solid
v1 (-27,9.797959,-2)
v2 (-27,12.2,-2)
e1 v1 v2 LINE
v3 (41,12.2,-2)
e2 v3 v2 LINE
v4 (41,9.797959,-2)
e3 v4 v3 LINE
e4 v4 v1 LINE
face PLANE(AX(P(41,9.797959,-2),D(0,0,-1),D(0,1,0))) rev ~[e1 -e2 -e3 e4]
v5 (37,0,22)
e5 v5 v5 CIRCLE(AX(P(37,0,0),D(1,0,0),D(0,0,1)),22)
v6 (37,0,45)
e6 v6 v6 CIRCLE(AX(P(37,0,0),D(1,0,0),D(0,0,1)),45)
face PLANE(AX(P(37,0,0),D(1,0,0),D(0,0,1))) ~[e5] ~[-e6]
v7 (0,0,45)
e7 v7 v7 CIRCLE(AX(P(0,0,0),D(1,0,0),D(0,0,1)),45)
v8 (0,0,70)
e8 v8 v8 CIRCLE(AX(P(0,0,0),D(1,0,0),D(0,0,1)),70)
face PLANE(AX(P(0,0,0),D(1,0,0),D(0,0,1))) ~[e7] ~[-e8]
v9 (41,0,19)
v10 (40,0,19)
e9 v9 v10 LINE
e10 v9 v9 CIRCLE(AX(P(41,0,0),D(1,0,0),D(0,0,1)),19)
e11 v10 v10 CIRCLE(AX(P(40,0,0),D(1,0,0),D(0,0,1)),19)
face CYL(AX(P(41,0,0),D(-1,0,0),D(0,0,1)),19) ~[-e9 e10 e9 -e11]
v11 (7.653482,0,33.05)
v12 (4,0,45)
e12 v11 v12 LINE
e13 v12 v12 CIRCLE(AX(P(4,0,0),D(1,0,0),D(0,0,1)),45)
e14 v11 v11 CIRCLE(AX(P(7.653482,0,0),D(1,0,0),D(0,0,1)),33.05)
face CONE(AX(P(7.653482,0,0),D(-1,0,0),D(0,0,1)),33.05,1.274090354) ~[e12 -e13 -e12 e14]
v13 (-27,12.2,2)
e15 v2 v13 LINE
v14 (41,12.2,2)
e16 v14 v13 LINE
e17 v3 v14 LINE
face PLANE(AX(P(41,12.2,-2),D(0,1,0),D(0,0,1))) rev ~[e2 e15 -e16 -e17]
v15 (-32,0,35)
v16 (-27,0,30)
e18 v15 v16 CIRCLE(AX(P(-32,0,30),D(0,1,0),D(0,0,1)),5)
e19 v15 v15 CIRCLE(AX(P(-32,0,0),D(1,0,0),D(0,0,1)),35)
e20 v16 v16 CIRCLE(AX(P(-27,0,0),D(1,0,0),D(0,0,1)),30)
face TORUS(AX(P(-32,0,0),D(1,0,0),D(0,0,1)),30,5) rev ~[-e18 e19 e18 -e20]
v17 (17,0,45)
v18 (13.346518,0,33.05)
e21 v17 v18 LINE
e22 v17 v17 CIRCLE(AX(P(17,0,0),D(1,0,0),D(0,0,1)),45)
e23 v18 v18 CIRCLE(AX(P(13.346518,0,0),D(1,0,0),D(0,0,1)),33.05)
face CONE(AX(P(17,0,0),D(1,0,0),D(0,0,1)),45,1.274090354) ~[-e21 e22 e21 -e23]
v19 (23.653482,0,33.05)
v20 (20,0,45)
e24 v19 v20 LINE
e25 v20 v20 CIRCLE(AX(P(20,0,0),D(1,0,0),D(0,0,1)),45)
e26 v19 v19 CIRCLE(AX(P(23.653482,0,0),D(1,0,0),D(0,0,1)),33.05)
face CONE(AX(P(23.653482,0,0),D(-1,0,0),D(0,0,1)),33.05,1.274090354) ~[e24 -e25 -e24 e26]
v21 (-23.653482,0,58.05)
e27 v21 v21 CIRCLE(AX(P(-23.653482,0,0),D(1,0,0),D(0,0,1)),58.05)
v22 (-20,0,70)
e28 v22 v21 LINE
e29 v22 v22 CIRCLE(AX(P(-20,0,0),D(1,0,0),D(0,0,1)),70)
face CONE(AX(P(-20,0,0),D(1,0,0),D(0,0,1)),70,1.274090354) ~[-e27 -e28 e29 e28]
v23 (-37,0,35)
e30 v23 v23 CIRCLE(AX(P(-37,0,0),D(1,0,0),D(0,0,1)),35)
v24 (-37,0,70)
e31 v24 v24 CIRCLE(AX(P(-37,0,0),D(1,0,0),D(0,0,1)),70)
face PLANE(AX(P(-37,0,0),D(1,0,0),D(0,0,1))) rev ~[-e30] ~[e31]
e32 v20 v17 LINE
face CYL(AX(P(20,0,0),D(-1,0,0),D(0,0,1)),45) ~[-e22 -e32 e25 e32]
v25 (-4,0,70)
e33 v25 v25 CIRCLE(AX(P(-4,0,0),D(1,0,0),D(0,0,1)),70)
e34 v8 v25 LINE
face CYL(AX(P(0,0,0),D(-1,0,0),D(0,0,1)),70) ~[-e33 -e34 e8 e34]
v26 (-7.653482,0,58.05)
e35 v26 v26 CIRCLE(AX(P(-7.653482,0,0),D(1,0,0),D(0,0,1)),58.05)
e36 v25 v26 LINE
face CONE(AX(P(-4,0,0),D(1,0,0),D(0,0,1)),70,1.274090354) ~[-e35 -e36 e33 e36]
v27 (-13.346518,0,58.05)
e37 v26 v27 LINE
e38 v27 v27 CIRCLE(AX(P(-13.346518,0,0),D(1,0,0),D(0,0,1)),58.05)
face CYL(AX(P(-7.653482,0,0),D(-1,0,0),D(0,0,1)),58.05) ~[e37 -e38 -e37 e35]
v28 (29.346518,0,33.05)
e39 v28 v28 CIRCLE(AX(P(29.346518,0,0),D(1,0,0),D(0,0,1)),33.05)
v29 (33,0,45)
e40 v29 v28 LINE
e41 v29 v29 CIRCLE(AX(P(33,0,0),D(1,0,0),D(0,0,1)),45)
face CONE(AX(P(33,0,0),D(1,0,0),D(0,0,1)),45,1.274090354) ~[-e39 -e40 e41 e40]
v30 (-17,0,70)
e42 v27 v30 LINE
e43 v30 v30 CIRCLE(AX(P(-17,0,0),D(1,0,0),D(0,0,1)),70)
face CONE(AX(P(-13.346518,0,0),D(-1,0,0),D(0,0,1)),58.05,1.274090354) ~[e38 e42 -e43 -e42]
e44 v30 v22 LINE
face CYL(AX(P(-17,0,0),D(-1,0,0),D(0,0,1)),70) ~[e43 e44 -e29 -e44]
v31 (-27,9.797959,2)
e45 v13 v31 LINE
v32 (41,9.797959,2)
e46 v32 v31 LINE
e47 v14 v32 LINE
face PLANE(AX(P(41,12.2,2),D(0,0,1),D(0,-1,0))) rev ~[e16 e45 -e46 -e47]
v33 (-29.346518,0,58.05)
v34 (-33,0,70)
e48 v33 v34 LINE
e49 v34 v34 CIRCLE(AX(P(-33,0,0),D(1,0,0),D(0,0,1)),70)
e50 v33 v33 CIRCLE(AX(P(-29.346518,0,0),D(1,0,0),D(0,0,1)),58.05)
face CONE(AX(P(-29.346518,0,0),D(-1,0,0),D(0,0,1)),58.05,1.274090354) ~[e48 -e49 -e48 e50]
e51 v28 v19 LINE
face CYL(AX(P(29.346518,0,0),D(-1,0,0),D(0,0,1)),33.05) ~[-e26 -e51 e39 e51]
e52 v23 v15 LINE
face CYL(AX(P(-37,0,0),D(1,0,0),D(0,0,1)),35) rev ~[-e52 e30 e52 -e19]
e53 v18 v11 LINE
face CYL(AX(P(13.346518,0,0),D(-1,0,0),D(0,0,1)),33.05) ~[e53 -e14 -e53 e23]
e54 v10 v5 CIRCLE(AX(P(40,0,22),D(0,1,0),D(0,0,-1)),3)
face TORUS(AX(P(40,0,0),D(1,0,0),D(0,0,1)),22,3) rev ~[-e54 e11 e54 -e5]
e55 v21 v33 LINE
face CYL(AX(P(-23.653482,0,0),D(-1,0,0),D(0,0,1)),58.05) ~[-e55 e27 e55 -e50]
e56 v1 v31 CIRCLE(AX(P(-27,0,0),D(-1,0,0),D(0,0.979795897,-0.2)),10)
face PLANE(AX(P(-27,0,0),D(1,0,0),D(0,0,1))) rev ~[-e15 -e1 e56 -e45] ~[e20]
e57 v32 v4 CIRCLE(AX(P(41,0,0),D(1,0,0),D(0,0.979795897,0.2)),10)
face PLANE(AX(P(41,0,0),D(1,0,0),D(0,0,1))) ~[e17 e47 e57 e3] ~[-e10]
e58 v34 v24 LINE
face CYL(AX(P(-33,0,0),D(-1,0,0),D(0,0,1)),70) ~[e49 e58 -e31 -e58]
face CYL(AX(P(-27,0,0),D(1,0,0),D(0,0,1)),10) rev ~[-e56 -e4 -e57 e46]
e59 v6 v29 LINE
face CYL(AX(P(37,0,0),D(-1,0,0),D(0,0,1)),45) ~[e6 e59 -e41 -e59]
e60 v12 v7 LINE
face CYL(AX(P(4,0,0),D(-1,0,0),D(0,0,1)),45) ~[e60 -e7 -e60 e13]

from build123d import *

# Parameters (mm, degrees)
F3_DEPTH = 78.001


with BuildPart() as f1:
    # F0 (on Front) → F1 (revolve)
    with BuildSketch(Plane.XZ):
        with BuildLine():
            Line((-27, 10), (41, 10))
            Line((41, 10), (41, 19))
            Line((41, 19), (40, 19))
            ThreePointArc((40, 19), (37.8786796564, 19.8786796564), (37, 22))
            Line((37, 22), (37, 45))
            Line((37, 45), (33, 45))
            Line((33, 45), (29.3465183566, 33.05))
            Line((29.3465183566, 33.05), (23.6534816434, 33.05))
            Line((23.6534816434, 33.05), (20, 45))
            Line((20, 45), (17, 45))
            Line((17, 45), (13.3465183566, 33.05))
            Line((13.3465183566, 33.05), (7.6534816434, 33.05))
            Line((7.6534816434, 33.05), (4, 45))
            Line((4, 45), (0, 45))
            Line((0, 45), (0, 70))
            Line((0, 70), (-4, 70))
            Line((-4, 70), (-7.6534816434, 58.05))
            Line((-7.6534816434, 58.05), (-13.3465183566, 58.05))
            Line((-13.3465183566, 58.05), (-17, 70))
            Line((-17, 70), (-20, 70))
            Line((-20, 70), (-23.6534816434, 58.05))
            Line((-23.6534816434, 58.05), (-29.3465183566, 58.05))
            Line((-29.3465183566, 58.05), (-33, 70))
            Line((-33, 70), (-37, 70))
            Line((-37, 70), (-37, 35))
            Line((-37, 35), (-32, 35))
            ThreePointArc((-32, 35), (-28.4644660941, 33.5355339059), (-27, 30))
            Line((-27, 30), (-27, 10))
        make_face()
    revolve(axis=Axis((1.6295525322, 0, 0), (1, 0, 0)))

    # F2 (on face) → F3 (cut, through all)
    with BuildSketch(Plane.YZ.offset(41)):
        with BuildLine():
            ThreePointArc((9.7979589711, 2), (-10, 0), (9.7979589711, -2))
            ThreePointArc((9.7979589711, -2), (9.9493615301, -1.0050896201), (10, 0))
            ThreePointArc((10, 0), (9.9493615301, 1.0050896201), (9.7979589711, 2))
        make_face()
        with BuildLine():
            ThreePointArc((10, 0), (9.9493615301, -1.0050896201), (9.7979589711, -2))
            Line((9.7979589711, -2), (12.2, -2))
            Line((12.2, -2), (12.2, 2))
            Line((12.2, 2), (9.7979589711, 2))
            ThreePointArc((9.7979589711, 2), (9.9493615301, 1.0050896201), (10, 0))
        make_face()
    extrude(amount=-F3_DEPTH, mode=Mode.SUBTRACT)


solid = f1.part
